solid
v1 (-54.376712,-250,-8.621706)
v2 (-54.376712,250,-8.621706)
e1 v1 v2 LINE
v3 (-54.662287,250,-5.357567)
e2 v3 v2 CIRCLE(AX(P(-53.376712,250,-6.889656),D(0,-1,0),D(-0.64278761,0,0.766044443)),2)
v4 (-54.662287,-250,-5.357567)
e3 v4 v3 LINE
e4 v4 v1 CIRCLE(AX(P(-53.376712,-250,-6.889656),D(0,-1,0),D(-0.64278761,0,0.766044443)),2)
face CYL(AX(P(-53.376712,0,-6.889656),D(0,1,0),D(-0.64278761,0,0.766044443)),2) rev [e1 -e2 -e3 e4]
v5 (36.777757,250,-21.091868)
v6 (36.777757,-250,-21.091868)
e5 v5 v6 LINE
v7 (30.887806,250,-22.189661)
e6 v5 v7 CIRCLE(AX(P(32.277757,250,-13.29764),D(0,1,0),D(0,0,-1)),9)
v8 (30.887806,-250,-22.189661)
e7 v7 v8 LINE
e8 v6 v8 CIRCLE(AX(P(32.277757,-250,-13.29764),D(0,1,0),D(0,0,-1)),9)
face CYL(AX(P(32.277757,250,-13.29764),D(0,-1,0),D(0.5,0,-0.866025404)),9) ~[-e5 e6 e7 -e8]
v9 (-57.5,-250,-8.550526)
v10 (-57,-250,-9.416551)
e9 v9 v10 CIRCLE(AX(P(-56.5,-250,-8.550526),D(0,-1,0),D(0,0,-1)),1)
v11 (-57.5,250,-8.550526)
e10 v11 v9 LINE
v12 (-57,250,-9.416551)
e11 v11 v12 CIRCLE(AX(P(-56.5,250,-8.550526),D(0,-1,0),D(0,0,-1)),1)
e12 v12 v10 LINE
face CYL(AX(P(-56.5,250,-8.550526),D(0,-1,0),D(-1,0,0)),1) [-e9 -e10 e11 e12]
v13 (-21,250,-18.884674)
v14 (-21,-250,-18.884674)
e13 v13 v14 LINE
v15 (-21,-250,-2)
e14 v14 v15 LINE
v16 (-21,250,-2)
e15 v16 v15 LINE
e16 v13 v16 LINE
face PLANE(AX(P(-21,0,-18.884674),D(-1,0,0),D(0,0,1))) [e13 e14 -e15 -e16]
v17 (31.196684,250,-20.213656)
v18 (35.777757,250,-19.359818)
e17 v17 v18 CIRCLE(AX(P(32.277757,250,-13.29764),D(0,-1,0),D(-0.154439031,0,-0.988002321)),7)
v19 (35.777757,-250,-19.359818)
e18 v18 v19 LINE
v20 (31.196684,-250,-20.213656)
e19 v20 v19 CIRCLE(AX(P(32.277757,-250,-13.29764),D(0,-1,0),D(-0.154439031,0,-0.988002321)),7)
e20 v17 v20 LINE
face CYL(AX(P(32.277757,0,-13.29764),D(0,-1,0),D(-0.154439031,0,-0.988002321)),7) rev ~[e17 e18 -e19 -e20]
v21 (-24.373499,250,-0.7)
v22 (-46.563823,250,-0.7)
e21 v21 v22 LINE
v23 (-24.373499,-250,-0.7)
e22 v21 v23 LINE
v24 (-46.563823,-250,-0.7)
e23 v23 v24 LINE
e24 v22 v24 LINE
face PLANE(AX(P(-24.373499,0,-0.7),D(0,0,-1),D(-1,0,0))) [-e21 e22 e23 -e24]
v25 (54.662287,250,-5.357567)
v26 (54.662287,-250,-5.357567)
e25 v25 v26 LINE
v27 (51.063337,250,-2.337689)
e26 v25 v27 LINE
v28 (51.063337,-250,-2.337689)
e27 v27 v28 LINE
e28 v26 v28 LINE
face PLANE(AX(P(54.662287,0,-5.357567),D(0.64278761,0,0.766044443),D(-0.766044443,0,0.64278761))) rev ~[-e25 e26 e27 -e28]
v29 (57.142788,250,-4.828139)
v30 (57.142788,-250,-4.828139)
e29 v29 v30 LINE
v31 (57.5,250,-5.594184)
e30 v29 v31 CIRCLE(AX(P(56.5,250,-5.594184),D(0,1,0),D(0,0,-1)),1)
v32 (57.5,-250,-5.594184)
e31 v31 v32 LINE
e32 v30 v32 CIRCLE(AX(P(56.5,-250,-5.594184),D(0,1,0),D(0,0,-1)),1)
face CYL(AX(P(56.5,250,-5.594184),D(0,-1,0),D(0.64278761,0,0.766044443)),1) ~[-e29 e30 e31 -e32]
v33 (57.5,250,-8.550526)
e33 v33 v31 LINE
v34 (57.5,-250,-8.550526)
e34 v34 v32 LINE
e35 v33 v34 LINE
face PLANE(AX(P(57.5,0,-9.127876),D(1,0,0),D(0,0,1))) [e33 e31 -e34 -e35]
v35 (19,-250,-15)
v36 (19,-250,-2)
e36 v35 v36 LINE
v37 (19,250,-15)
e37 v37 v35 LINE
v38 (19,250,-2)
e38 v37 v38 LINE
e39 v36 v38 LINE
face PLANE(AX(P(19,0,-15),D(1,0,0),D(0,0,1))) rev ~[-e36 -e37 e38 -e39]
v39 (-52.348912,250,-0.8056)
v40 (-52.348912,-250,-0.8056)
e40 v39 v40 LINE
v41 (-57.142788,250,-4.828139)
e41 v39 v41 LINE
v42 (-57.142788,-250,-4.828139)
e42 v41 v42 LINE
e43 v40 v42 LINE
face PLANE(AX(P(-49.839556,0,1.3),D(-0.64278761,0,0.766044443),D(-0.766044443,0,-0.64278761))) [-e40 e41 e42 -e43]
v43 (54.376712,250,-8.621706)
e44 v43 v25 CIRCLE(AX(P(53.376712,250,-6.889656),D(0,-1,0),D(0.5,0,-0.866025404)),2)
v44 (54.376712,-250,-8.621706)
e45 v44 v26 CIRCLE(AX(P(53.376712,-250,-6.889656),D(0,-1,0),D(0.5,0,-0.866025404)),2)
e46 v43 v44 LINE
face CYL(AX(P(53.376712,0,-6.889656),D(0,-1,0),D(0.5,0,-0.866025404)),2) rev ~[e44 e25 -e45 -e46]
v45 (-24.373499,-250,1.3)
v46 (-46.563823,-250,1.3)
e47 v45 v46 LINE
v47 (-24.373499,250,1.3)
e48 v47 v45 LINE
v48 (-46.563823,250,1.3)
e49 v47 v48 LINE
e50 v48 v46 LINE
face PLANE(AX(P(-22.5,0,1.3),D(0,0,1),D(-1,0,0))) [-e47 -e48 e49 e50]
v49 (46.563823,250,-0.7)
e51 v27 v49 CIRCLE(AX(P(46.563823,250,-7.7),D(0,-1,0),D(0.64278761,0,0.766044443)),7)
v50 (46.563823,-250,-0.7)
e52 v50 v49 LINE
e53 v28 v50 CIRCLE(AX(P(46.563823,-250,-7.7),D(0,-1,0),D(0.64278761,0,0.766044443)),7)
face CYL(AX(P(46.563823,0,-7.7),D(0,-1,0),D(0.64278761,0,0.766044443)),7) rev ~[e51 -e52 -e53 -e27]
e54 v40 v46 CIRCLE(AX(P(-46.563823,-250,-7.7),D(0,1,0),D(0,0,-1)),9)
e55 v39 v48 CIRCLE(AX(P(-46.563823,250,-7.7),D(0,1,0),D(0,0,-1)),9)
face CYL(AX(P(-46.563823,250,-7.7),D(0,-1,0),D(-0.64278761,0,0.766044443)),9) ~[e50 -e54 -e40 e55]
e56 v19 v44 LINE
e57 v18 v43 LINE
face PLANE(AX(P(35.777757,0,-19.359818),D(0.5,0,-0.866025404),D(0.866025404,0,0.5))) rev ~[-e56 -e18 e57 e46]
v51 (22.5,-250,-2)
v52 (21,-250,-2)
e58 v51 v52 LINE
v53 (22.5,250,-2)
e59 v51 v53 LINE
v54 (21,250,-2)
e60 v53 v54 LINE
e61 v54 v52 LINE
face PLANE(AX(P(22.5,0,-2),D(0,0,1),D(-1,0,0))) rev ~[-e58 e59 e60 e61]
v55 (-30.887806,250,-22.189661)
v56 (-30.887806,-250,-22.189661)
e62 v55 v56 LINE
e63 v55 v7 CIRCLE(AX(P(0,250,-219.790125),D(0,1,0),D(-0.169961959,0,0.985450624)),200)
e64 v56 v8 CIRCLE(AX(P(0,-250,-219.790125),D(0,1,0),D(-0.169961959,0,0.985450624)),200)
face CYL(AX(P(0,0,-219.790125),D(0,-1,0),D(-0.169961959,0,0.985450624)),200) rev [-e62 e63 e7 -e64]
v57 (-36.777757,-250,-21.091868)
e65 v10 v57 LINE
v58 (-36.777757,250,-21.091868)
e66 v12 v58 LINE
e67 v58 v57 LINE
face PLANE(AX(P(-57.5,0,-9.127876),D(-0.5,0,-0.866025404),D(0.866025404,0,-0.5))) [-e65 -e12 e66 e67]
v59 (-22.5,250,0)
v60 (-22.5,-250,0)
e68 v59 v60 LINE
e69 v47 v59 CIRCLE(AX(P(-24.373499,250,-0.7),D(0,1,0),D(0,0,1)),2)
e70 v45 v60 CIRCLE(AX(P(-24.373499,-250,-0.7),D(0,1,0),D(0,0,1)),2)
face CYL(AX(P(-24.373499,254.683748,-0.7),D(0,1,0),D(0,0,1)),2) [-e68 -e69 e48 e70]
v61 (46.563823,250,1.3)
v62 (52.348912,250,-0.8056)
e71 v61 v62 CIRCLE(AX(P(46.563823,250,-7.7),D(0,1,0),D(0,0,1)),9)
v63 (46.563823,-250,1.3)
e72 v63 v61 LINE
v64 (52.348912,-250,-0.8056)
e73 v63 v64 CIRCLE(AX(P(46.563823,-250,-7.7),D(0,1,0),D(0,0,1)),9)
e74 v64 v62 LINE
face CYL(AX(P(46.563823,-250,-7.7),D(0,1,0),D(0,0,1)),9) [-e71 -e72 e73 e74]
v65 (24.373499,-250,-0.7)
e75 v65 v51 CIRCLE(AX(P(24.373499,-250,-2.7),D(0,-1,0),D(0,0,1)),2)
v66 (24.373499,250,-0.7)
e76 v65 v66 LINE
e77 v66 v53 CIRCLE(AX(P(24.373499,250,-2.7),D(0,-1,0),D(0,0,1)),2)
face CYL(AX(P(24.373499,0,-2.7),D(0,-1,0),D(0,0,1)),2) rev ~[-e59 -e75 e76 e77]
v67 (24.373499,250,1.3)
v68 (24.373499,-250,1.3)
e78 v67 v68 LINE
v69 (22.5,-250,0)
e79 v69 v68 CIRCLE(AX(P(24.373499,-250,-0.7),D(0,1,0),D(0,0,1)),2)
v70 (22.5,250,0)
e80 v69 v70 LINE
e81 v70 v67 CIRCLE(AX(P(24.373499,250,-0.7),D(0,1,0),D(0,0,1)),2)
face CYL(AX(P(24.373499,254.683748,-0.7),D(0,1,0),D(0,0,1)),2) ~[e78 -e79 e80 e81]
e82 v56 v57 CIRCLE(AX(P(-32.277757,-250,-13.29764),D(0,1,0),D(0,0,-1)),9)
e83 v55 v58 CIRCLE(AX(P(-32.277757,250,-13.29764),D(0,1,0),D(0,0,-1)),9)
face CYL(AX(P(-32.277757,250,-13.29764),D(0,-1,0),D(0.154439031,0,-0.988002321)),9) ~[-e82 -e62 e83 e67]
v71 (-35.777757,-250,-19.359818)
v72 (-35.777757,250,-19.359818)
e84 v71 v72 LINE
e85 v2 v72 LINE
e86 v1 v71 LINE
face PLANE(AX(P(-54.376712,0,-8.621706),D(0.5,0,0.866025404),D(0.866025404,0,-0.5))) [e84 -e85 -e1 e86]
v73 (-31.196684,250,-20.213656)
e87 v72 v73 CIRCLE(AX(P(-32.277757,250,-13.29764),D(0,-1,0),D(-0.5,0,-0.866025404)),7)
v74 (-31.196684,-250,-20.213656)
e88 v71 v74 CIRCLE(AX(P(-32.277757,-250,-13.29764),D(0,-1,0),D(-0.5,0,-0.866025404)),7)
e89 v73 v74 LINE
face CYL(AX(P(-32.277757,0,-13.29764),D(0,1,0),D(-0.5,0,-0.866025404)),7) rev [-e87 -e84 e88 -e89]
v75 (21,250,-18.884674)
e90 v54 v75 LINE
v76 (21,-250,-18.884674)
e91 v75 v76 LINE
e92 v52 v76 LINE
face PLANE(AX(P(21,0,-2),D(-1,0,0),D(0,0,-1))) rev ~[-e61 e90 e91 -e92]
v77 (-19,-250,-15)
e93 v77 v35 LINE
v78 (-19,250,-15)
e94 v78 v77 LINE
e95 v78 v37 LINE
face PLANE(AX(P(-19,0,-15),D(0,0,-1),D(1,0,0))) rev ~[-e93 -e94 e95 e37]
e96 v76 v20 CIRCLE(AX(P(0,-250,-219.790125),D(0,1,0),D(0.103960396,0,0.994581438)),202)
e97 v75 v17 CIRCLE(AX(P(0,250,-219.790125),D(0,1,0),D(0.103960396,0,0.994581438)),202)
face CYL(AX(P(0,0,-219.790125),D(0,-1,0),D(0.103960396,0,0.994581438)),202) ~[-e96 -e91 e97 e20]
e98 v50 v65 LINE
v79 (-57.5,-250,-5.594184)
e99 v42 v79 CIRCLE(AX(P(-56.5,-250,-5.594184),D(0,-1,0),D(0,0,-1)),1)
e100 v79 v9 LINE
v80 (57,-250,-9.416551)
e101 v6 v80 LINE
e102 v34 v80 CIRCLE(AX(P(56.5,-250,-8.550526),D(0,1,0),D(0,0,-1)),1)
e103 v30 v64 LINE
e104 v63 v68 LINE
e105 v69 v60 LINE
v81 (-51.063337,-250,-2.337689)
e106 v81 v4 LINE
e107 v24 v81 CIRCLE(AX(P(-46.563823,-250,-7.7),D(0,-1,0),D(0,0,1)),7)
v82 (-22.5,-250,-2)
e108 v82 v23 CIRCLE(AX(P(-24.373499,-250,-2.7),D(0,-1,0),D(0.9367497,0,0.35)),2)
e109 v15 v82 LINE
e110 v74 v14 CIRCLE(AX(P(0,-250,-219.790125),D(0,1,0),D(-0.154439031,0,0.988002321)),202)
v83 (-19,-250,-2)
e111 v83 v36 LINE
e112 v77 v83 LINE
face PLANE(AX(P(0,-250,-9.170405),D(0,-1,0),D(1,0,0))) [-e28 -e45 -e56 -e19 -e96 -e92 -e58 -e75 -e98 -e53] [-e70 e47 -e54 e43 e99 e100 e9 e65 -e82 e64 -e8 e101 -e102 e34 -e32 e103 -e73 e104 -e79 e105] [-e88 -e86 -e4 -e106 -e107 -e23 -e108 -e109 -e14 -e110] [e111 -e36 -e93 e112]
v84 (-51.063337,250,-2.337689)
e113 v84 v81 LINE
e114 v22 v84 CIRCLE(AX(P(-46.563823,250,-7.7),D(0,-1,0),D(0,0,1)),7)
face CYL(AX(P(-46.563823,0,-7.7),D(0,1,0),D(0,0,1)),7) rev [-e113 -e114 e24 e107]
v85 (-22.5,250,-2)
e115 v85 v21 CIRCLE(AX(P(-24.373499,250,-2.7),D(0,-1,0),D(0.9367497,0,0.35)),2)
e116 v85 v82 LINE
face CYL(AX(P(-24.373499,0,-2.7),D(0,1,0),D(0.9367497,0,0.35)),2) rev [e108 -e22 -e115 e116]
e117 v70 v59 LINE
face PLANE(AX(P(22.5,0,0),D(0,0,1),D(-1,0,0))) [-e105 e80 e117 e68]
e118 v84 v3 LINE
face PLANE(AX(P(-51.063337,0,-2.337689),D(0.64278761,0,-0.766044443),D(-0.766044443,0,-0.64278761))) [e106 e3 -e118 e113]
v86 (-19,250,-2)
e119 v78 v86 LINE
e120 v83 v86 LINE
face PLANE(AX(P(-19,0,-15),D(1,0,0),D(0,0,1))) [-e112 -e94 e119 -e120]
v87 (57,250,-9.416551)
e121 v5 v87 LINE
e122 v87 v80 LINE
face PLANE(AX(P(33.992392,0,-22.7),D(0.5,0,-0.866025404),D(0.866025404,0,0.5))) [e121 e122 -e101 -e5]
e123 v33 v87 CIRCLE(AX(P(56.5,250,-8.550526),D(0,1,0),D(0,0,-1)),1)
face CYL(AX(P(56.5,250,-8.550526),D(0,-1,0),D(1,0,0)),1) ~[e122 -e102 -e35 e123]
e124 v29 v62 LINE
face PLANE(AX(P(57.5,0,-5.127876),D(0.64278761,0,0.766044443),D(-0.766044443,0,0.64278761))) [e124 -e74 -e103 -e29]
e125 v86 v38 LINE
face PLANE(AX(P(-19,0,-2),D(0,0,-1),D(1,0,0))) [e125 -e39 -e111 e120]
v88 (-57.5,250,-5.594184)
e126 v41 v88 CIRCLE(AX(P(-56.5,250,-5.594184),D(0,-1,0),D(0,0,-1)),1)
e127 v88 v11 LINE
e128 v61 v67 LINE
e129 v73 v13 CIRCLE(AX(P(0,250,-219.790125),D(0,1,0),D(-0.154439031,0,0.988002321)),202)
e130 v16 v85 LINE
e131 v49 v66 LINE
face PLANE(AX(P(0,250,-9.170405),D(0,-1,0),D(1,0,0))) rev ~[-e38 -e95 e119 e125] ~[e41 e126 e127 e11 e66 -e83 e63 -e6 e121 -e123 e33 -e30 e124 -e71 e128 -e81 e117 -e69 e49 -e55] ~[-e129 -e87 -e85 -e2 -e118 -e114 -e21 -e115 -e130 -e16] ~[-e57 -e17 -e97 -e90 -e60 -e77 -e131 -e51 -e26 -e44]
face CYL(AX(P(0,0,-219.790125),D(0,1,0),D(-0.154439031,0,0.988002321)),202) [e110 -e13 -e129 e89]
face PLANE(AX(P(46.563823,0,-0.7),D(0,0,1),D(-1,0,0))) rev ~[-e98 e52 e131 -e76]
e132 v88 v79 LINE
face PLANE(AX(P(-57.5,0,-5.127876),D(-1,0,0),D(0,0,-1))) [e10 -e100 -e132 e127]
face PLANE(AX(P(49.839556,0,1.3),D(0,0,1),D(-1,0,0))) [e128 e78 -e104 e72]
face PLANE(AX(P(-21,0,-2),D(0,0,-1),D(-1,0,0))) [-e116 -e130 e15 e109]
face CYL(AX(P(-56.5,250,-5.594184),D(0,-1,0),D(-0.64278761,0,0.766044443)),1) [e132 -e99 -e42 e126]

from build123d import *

# Parameters (mm, degrees)
F1_DEPTH    = 250
F2_W        = 38
F2_H        = 13
F3_DEPTH    = 250
F4_T1_DEPTH = 509.3674969976
F5_R        = 9
F6_R        = 1
F8_DEPTH    = 250


# Not quite as in the source:
# - a fillet or chamfer that OpenCascade refuses, or shapes differently, is made with other operations: its cross-section is extruded or revolved along the edge and cut away or added


with BuildPart() as f1:
    # F0 (on Front) → F1 (new body, symmetric)
    with BuildSketch(Plane.XZ):
        with BuildLine():
            Line((22.5, 0), (0, 0))
            Line((0, 0), (-22.5, 0))
            Line((-22.5, 0), (-22.5, 1.3))
            Line((-22.5, 1.3), (-49.8395555688, 1.3))
            Line((-49.8395555688, 1.3), (-57.5, -5.1278760969))
            Line((-57.5, -5.1278760969), (-57.5, -9.1278760969))
            Line((-57.5, -9.1278760969), (-33.9923918332, -22.7))
            ThreePointArc((-33.9923918332, -22.7), (0, -19.7901248096), (33.9923918332, -22.7))
            Line((33.9923918332, -22.7), (57.5, -9.1278760969))
            Line((57.5, -9.1278760969), (57.5, -5.1278760969))
            Line((57.5, -5.1278760969), (49.8395555688, 1.3))
            Line((49.8395555688, 1.3), (22.5, 1.3))
            Line((22.5, 1.3), (22.5, 0))
        make_face()
    extrude(amount=F1_DEPTH, both=True)

    # F2 (on Front) → F3 (cut, symmetric)
    with BuildSketch(Plane.XZ):
        with Locations((0, -8.5)):
            Rectangle(F2_W, F2_H)
    extrude(amount=F3_DEPTH, both=True, mode=Mode.SUBTRACT)

    # F4: fillet of radius 2 on 2 edges, made by hand

    # F4_s2 → F4_t1 (cut)
    with BuildSketch(Plane.XZ.offset(-254.6837484988)):
        with BuildLine():
            ThreePointArc((-24.3734993995, 1.3), (-23.2333239744, 0.9431676725), (-22.5, 0))
            Line((-22.5, 0), (-22.5, 1.3))
            Line((-22.5, 1.3), (-24.3734993995, 1.3))
        make_face()
        with BuildLine():
            ThreePointArc((24.3734993995, 1.3), (23.2333239744, 0.9431676725), (22.5, 0))
            Line((22.5, 0), (22.5, 1.3))
            Line((22.5, 1.3), (24.3734993995, 1.3))
        make_face()
    extrude(amount=F4_T1_DEPTH, mode=Mode.SUBTRACT)

    # F5
    f5_edges = [f1.edges().sort_by_distance(p)[0] for p in [
        (-49.839556, 0, 1.3),
        (49.839556, 0, 1.3),
        (33.992392, 0, -22.7),
        (-33.992392, 0, -22.7),
    ]]
    fillet(f5_edges, radius=F5_R)

    # F6
    f6_edges = [f1.edges().sort_by_distance(p)[0] for p in [
        (-57.5, 0, -5.127876),
        (57.5, 0, -5.127876),
        (57.5, 0, -9.127876),
        (-57.5, 0, -9.127876),
    ]]
    fillet(f6_edges, radius=F6_R)

    # F7 (on Front) → F8 (cut, symmetric)
    with BuildSketch(Plane.XZ):
        with BuildLine():
            ThreePointArc((-35.7777574473, -19.3598176053), (-33.5603570371, -20.1791322254), (-31.1966842313, -20.2136560239))
            ThreePointArc((-31.1966842313, -20.2136560239), (-26.106800057, -19.4842711987), (-21, -18.8846744107))
            Line((-21, -18.8846744107), (-21, -2))
            Line((-21, -2), (-22.5, -2))
            ThreePointArc((-22.5, -2), (-23.2333239744, -1.0568323275), (-24.3734993995, -0.7))
            Line((-24.3734993995, -0.7), (-46.5638234604, -0.7))
            ThreePointArc((-46.5638234604, -0.7), (-48.9579644637, -1.1221516545), (-51.0633367282, -2.3376888982))
            Line((-51.0633367282, -2.3376888982), (-54.6622869129, -5.3575666708))
            ThreePointArc((-54.6622869129, -5.3575666708), (-55.3691010897, -7.0639670425), (-54.3767116936, -8.6217063646))
            Line((-54.3767116936, -8.6217063646), (-35.7777574473, -19.3598176053))
        make_face()
        with BuildLine():
            Line((22.5, -2), (21, -2))
            Line((21, -2), (21, -18.8846744107))
            ThreePointArc((21, -18.8846744107), (26.106800057, -19.4842711987), (31.1966842313, -20.2136560239))
            ThreePointArc((31.1966842313, -20.2136560239), (33.5603570371, -20.1791322254), (35.7777574473, -19.3598176053))
            Line((35.7777574473, -19.3598176053), (54.3767116936, -8.6217063646))
            ThreePointArc((54.3767116936, -8.6217063646), (55.3691010897, -7.0639670425), (54.6622869129, -5.3575666708))
            Line((54.6622869129, -5.3575666708), (51.0633367282, -2.3376888982))
            ThreePointArc((51.0633367282, -2.3376888982), (48.9579644637, -1.1221516545), (46.5638234604, -0.7))
            Line((46.5638234604, -0.7), (24.3734993995, -0.7))
            ThreePointArc((24.3734993995, -0.7), (23.2333239744, -1.0568323275), (22.5, -2))
        make_face()
    extrude(amount=F8_DEPTH, both=True, mode=Mode.SUBTRACT)


solid = f1.part
